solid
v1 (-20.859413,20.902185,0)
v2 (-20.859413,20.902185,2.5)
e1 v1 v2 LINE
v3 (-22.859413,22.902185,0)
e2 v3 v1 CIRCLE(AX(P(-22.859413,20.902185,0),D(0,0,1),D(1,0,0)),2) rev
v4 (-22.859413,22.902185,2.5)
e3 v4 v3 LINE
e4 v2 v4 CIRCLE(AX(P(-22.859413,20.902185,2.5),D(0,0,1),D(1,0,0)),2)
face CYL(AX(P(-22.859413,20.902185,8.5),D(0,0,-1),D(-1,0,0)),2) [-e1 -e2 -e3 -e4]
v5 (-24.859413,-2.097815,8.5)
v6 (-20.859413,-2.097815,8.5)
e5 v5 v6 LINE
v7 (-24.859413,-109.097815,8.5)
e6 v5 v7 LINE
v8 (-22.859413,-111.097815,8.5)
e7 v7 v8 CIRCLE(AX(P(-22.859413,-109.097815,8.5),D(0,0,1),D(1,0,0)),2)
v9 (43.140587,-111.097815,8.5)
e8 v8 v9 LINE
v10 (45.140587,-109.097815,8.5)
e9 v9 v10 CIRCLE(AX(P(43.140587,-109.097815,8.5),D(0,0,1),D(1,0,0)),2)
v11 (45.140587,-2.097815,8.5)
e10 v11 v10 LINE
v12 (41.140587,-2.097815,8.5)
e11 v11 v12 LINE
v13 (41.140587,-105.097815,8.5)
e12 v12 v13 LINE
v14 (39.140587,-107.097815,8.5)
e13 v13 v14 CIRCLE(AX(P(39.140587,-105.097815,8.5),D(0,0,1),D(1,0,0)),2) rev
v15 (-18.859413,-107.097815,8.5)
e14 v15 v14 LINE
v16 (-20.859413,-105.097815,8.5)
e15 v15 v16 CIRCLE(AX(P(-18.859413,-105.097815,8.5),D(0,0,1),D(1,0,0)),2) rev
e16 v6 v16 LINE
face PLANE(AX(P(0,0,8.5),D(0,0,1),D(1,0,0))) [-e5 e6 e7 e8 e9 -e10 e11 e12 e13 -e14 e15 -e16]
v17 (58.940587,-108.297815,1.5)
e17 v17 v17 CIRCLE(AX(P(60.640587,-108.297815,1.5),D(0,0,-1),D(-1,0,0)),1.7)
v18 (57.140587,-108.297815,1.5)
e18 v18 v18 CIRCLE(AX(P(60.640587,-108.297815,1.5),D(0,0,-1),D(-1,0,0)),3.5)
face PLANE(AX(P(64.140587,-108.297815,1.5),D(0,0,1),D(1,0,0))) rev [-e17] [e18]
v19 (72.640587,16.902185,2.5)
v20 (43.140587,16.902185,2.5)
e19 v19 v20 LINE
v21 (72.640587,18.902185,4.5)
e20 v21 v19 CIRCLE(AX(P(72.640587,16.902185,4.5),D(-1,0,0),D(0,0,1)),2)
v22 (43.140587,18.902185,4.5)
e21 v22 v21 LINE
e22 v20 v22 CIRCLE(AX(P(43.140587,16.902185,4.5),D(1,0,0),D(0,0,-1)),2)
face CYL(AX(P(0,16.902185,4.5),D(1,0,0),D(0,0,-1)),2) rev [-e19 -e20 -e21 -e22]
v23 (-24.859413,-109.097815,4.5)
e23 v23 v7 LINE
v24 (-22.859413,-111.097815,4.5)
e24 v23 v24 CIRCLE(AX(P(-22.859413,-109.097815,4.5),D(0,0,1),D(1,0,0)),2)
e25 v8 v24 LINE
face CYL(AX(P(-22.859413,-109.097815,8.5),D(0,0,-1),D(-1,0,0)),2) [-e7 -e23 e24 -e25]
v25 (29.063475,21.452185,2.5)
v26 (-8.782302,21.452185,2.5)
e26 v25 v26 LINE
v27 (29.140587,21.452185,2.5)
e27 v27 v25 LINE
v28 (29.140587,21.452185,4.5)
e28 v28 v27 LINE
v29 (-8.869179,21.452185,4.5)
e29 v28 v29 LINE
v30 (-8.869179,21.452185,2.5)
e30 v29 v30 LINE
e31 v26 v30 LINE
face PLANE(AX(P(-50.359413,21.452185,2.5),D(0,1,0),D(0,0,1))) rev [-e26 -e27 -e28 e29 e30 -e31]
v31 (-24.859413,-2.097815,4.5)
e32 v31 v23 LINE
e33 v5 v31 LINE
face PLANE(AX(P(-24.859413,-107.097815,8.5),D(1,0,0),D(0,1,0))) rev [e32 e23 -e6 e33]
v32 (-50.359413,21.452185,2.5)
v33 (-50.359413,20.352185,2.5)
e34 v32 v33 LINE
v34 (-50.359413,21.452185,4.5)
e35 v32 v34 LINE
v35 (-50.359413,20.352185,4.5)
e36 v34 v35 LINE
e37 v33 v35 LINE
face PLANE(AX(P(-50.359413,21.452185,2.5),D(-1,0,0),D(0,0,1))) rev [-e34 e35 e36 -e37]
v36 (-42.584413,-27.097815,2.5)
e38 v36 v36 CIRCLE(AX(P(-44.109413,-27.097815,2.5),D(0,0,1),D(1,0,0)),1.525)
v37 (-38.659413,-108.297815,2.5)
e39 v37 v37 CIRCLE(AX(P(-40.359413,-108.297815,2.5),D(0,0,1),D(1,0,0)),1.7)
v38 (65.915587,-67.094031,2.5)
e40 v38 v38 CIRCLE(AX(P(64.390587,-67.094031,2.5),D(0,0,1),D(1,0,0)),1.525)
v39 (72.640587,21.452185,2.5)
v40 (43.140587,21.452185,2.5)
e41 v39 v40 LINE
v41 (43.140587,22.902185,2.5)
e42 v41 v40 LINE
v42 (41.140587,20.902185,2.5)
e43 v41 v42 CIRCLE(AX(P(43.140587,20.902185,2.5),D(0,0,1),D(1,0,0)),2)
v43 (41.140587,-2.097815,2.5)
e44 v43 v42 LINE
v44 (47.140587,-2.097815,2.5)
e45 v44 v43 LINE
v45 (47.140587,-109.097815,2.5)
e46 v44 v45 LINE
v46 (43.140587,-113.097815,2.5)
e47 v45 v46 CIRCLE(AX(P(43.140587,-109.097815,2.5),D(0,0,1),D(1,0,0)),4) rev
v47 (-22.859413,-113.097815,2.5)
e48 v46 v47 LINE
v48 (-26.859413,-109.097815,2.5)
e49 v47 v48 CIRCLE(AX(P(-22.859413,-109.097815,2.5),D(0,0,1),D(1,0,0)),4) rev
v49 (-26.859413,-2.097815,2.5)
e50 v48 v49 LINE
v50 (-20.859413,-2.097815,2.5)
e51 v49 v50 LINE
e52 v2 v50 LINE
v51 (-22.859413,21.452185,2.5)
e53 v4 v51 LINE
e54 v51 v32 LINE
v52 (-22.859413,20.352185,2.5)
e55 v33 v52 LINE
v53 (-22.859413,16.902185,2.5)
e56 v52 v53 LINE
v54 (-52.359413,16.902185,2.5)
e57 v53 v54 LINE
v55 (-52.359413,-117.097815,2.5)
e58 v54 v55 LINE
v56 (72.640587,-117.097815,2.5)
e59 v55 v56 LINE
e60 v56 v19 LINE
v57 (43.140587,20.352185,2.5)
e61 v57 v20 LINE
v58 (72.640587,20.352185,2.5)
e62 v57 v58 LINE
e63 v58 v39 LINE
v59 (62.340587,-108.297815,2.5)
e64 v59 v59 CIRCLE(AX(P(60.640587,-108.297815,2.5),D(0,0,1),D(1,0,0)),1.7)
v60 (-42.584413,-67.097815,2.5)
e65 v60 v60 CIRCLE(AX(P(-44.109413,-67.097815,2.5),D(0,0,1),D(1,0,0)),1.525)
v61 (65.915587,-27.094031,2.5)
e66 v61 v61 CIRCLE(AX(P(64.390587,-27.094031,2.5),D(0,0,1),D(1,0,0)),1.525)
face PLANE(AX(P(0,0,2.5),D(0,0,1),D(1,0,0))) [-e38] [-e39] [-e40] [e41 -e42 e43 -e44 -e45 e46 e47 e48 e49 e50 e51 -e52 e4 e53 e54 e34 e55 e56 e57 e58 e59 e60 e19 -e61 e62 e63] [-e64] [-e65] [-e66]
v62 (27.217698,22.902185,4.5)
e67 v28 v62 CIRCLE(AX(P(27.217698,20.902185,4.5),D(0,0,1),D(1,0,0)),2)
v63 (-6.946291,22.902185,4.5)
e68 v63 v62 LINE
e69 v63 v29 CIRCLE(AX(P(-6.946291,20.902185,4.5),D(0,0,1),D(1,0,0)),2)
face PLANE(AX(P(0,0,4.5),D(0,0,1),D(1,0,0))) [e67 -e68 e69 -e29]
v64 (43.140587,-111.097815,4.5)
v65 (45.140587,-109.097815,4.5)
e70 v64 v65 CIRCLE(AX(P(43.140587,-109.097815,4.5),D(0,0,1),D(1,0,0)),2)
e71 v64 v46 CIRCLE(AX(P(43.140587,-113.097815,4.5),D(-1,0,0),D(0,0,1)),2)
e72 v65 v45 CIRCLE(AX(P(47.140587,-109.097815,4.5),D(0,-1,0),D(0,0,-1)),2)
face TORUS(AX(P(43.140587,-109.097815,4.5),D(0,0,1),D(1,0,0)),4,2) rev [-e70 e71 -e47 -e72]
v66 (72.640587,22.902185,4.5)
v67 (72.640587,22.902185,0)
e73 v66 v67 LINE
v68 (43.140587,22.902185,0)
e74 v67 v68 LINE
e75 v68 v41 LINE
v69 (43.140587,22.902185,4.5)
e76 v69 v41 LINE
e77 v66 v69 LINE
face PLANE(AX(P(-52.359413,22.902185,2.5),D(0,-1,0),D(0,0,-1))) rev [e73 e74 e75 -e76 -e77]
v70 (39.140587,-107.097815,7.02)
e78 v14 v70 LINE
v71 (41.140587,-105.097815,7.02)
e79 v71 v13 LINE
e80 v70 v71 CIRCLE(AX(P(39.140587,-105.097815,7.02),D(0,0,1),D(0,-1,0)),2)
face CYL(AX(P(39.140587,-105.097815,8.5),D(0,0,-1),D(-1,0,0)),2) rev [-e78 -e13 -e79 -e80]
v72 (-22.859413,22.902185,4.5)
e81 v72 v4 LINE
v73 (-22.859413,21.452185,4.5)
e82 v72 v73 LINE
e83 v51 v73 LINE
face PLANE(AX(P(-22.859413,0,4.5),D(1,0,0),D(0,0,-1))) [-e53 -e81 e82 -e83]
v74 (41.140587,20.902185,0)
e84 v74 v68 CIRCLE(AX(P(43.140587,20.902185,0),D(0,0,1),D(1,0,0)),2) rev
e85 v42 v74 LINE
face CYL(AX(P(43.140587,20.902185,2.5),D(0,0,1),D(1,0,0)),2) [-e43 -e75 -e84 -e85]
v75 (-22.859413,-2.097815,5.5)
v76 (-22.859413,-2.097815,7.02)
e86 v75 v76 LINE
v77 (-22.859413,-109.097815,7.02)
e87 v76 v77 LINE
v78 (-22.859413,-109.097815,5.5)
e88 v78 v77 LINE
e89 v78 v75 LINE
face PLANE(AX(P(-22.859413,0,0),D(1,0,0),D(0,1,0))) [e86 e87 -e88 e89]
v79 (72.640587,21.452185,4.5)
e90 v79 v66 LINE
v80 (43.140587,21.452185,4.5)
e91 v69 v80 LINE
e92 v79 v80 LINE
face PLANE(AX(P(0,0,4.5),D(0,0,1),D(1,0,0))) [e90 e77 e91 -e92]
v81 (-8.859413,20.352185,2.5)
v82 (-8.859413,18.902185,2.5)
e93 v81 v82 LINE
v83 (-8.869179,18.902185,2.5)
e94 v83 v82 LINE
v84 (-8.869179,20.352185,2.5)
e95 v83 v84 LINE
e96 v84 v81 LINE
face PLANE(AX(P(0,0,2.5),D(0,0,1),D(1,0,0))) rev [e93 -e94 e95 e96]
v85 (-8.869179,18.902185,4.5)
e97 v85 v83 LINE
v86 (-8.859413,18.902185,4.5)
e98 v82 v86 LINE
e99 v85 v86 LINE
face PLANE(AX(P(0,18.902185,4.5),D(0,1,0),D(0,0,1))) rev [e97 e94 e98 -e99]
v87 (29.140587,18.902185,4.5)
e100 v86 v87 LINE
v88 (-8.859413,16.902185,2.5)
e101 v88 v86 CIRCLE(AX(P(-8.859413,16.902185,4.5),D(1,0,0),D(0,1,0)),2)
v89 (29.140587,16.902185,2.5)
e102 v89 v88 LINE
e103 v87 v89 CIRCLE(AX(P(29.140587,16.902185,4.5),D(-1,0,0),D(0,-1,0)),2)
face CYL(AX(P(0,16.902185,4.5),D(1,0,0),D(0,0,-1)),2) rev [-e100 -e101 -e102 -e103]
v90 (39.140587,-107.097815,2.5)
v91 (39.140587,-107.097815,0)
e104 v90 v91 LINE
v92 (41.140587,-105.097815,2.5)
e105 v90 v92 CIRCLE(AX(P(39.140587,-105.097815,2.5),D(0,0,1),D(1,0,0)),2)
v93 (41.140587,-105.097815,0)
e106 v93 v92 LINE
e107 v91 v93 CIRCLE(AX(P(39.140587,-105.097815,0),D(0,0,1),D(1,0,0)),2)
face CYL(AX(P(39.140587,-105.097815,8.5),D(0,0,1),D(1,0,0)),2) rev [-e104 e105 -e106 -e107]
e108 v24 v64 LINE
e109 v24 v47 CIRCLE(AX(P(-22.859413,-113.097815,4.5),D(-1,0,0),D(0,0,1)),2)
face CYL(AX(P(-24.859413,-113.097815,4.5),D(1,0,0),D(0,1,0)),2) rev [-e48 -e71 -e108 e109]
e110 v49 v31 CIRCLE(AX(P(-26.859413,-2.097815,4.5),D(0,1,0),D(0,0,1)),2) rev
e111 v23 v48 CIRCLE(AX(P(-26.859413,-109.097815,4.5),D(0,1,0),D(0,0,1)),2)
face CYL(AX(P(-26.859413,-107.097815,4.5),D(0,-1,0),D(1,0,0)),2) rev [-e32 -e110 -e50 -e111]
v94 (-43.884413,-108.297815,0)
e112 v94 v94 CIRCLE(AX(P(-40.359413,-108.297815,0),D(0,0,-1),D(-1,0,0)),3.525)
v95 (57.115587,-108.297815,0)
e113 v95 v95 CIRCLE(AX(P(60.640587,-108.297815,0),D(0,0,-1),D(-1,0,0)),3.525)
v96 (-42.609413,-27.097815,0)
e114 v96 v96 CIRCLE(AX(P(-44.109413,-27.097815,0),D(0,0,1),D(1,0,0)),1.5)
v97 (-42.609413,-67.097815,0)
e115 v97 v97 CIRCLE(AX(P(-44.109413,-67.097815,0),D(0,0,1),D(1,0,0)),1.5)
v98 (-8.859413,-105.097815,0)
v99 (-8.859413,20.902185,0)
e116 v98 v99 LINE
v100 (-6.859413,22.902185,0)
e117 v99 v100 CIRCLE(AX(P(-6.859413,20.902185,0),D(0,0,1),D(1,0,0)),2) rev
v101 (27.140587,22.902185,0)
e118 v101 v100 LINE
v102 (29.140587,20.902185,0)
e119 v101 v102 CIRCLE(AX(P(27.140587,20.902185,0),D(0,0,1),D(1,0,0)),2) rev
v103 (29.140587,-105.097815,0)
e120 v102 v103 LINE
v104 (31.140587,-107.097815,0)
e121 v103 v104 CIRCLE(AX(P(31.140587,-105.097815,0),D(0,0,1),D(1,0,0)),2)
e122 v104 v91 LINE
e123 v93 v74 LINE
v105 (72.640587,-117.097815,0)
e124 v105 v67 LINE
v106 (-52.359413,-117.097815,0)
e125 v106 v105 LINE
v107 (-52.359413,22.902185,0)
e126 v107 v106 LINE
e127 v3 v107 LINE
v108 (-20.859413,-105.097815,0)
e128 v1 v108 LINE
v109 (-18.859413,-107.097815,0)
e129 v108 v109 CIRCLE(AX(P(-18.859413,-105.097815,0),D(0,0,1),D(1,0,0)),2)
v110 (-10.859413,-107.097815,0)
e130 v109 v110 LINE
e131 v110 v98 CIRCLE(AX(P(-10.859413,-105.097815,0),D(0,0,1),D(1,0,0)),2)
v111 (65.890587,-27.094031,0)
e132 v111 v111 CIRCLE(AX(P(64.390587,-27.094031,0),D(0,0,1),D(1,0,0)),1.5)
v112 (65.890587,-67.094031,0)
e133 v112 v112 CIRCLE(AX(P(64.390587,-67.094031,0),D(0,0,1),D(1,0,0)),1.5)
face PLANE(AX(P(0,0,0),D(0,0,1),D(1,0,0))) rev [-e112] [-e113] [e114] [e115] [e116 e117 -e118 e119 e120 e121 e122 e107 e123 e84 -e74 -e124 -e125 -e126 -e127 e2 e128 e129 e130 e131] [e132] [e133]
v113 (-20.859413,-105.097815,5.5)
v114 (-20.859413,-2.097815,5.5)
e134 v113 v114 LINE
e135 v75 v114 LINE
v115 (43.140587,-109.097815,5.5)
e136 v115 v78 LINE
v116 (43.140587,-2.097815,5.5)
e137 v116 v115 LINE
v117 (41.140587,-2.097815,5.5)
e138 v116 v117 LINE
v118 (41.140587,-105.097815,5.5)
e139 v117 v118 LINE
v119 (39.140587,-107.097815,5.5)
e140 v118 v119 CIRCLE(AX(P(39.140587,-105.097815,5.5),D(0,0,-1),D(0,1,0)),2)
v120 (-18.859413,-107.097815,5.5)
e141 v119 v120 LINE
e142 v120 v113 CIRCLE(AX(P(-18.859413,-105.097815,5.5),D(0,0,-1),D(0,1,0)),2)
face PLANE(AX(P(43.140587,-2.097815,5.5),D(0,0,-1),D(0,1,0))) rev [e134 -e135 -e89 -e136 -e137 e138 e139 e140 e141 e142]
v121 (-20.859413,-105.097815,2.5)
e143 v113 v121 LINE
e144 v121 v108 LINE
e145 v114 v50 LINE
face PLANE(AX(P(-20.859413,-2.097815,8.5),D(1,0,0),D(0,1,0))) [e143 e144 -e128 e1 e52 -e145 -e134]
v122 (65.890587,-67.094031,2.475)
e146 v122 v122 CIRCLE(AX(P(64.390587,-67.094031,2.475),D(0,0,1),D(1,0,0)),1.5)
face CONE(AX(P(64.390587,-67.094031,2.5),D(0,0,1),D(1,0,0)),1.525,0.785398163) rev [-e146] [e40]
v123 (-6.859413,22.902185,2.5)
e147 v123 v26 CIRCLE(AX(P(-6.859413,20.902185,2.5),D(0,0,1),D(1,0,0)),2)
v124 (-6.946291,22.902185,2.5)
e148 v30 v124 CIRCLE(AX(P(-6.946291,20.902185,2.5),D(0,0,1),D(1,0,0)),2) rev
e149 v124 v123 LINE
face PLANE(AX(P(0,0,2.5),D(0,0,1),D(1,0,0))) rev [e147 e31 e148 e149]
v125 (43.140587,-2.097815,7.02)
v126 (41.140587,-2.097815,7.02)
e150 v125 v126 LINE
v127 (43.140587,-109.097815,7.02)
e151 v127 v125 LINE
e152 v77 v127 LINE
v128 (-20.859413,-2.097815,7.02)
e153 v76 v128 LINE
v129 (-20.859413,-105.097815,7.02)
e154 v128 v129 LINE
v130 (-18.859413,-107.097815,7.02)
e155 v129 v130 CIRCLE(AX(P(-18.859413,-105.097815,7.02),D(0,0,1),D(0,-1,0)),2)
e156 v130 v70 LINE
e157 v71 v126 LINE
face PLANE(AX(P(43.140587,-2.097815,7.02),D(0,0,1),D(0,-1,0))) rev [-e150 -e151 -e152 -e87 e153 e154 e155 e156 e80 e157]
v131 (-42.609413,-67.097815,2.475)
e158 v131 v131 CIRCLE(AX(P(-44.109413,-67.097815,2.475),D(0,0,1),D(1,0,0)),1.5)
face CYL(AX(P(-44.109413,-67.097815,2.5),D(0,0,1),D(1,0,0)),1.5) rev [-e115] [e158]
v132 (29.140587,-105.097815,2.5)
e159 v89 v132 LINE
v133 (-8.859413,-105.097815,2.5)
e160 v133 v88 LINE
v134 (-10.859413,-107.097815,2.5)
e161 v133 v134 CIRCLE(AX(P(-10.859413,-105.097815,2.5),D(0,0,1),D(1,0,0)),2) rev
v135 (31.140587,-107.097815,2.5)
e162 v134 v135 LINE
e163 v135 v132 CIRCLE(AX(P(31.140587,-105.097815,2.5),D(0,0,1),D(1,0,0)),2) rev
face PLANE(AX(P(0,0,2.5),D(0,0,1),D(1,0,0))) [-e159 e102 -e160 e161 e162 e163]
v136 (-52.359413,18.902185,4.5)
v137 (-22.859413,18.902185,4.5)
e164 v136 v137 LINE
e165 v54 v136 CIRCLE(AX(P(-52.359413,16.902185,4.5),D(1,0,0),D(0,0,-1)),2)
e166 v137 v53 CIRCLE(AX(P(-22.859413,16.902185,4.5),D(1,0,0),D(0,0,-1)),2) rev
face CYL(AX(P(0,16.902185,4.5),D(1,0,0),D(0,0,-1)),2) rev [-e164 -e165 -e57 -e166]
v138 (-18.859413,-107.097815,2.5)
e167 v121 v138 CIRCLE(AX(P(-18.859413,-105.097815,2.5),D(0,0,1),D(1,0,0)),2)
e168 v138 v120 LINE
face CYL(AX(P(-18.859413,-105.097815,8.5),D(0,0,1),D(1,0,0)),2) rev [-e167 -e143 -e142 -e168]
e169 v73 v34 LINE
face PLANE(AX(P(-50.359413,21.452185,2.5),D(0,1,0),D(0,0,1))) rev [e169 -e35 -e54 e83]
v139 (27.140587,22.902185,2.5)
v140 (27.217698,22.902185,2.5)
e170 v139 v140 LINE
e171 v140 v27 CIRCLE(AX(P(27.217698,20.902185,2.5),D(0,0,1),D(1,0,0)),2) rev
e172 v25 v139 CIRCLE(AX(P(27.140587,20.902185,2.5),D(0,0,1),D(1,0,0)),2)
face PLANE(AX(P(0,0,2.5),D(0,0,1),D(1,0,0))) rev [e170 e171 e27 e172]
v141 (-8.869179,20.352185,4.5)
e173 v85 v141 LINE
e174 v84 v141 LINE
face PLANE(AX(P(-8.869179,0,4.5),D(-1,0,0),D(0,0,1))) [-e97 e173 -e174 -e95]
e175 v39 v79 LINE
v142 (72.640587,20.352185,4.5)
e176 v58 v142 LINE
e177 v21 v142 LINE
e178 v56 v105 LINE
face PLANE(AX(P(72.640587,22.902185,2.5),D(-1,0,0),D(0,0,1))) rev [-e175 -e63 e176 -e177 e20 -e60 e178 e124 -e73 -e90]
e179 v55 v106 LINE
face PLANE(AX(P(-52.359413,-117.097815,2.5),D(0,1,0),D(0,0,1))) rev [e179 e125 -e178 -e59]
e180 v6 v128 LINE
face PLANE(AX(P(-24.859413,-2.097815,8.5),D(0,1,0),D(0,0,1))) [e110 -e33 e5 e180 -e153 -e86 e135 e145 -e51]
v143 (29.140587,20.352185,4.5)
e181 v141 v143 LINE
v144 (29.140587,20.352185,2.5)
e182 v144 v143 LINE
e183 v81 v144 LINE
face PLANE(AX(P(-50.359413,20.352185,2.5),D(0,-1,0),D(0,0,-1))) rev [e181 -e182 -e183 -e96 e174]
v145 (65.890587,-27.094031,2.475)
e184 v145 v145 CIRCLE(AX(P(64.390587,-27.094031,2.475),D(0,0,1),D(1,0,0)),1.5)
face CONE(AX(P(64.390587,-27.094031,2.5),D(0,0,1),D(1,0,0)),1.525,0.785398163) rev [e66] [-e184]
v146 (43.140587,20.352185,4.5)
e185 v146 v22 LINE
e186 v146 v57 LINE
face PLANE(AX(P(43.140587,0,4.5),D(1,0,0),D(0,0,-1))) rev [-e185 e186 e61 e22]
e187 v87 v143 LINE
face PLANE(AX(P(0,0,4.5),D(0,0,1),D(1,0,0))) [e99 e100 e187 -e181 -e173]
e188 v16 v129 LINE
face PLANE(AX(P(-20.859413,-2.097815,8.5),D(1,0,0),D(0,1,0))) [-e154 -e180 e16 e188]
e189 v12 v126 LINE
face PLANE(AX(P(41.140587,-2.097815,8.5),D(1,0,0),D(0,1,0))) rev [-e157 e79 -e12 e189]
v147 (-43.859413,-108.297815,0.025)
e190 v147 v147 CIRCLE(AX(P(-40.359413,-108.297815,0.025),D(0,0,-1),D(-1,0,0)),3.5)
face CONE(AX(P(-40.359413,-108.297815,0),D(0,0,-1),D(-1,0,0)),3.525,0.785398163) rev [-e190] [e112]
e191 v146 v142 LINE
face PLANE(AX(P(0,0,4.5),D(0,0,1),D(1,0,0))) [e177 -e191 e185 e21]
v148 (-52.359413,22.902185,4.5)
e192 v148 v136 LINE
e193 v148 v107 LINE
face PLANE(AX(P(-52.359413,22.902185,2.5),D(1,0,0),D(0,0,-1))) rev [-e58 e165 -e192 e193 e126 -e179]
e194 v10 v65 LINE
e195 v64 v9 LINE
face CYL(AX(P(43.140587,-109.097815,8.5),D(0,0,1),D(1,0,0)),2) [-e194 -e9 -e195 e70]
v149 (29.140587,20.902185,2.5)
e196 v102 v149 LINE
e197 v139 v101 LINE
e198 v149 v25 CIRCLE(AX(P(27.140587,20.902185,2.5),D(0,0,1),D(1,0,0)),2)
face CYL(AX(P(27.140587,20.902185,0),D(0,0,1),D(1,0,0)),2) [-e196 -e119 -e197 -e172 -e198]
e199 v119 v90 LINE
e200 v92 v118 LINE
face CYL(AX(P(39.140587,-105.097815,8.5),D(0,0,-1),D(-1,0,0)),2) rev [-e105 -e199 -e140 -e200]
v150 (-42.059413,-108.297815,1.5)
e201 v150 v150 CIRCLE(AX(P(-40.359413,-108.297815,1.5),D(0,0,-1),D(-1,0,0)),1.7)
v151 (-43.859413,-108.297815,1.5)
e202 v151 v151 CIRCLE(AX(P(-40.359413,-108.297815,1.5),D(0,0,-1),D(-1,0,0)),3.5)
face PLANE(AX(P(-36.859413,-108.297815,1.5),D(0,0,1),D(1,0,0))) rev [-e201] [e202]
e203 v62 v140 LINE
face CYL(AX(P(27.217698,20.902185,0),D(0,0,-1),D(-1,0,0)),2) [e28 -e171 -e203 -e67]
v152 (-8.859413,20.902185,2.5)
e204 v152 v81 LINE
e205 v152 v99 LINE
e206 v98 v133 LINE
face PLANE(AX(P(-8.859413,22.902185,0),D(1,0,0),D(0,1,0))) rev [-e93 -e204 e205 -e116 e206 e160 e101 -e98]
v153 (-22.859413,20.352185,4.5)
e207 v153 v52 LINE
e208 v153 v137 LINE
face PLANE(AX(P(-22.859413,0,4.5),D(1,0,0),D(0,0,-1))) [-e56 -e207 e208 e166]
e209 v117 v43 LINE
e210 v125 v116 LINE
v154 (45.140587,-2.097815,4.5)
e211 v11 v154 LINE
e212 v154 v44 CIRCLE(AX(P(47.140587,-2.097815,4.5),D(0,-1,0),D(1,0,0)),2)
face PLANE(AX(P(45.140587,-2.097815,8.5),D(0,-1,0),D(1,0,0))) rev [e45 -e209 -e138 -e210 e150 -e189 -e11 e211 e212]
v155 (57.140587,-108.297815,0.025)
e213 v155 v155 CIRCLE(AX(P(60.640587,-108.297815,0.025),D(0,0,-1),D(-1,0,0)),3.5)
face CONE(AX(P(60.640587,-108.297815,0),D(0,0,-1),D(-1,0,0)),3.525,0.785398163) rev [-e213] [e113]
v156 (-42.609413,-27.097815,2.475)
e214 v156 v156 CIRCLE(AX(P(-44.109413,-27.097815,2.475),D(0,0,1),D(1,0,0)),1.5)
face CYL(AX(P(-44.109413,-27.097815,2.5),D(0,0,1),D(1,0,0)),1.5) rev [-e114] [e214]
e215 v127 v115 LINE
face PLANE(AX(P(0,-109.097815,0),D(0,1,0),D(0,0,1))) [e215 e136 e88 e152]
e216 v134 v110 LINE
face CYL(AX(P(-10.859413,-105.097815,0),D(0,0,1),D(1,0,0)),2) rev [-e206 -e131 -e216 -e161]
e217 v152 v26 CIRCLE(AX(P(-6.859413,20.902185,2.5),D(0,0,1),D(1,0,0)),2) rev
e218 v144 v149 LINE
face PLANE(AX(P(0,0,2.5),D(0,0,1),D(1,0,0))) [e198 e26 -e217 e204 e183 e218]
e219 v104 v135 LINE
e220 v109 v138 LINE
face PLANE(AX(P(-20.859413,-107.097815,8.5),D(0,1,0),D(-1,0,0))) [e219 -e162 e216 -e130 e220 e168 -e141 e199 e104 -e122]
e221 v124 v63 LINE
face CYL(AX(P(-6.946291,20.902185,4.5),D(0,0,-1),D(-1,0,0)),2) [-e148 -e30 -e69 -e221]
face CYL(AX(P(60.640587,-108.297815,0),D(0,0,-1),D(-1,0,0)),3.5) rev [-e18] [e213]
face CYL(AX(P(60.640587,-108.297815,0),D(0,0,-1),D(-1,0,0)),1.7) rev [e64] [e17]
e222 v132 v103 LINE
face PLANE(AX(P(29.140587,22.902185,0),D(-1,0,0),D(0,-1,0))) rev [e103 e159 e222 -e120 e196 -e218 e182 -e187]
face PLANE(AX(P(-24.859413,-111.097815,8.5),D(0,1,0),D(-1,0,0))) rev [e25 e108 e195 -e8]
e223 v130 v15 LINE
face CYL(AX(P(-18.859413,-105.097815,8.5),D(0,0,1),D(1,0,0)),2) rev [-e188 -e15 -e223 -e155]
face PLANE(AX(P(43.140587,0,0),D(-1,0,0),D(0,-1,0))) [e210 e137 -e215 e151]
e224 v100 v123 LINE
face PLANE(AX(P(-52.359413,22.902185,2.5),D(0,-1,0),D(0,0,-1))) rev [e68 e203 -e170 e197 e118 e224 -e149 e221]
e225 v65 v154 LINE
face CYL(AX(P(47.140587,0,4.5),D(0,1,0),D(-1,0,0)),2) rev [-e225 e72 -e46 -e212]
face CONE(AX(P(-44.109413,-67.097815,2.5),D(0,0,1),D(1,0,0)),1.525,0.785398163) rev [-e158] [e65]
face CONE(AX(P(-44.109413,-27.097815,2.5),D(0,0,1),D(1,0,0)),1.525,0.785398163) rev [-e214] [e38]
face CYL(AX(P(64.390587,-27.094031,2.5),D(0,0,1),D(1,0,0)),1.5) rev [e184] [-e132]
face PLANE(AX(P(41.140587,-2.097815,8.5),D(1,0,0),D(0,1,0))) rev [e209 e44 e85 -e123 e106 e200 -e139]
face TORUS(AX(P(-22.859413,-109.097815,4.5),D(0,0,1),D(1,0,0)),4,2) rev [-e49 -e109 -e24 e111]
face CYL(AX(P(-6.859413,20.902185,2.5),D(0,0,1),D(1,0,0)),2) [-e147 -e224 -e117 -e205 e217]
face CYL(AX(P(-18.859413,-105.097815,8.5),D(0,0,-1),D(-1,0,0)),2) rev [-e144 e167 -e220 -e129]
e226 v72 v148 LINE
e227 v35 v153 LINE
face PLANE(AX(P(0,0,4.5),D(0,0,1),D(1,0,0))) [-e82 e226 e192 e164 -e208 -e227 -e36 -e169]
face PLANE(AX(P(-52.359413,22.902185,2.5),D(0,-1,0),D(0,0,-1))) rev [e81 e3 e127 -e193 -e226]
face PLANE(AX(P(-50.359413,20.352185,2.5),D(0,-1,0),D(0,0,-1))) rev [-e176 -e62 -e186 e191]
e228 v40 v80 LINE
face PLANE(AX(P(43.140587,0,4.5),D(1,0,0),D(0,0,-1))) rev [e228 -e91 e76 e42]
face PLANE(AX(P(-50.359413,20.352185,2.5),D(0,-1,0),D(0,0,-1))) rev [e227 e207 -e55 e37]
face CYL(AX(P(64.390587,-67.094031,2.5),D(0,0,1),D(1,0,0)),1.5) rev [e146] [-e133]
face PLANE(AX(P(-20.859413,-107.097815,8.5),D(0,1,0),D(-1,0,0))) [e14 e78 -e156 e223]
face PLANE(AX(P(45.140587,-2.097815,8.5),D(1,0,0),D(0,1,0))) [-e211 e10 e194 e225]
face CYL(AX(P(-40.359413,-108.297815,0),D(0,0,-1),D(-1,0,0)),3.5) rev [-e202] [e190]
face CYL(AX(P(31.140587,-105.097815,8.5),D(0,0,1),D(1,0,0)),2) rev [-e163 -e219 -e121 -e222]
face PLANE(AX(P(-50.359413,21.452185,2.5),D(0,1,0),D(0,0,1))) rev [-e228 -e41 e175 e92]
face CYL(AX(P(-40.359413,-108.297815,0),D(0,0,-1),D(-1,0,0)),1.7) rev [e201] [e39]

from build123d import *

# Parameters (mm, degrees)
ESBO_O1_W                                    = 125
ESBO_O1_H                                    = 140
RESSALTO_EXTRUS_O1_DEPTH                     = 2.5
RESSALTO_EXTRUS_O2_DEPTH                     = 6
ESBO_O3_W                                    = 1.52
ESBO_O3_H                                    = 105
CORTE_EXTRUS_O1_DEPTH                        = 2
ESBO_O4_W                                    = 1.52
ESBO_O4_H                                    = 105
CORTE_EXTRUS_O2_DEPTH                        = 2
ESBO_O5_W                                    = 66
ESBO_O5_H                                    = 1.52
CORTE_EXTRUS_O3_DEPTH                        = 2
FILETE1_R                                    = 2
FILETE2_R                                    = 2
FILETE3_R                                    = 2
ESBO_O6_W                                    = 12
ESBO_O6_H                                    = 130
CORTE_EXTRUS_O4_DEPTH                        = 138.929522592
FILETE4_R                                    = 2
FILETE5_R                                    = 2
ESBO_O7_W                                    = 19.009766083
ESBO_O7_H                                    = 4
ESBO_O7_W_2                                  = 19
ESBO_O7_W_3                                  = 29.5
RESSALTO_EXTRUS_O3_DEPTH                     = 2
ESBO_O8_W                                    = 123
ESBO_O8_H                                    = 1.1
CORTE_EXTRUS_O5_DEPTH                        = 2
FILETE6_R                                    = 2
FUROS_GUIA_COM_3_0MM1_D                      = 3
FUROS_GUIA_COM_3_0MM1_CSINK_D                = 3.05
FUROS_GUIA_COM_3_0MM1_CSINK_ANGLE            = 90
REBAIXO_PARA_PARAFUSO_COM_CABE_A_PAN_2_COUNT = 2
REBAIXO_PARA_PARAFUSO_COM_CABE_A_PAN_2_PITCH = 101


with BuildPart() as part:
    # Esboço1 → Ressalto-extrusão1 (new body)
    with BuildSketch(Plane.XY):
        with Locations((10.140586838, -47.097815293)):
            Rectangle(ESBO_O1_W, ESBO_O1_H)
    extrude(amount=RESSALTO_EXTRUS_O1_DEPTH)

    # Esboço2 → Ressalto-extrusão2 (add)
    with BuildSketch(Plane.XY.offset(2.5)):
        Polygon((-24.859413162, -2.097815293), (-20.859413162, -2.097815293), (-20.859413162, -107.097815293), (41.140586838, -107.097815293), (41.140586838, -2.097815293), (45.140586838, -2.097815293), (45.140586838, -107.097815293), (45.140586838, -111.097815293), (-24.859413162, -111.097815293), (-24.859413162, -107.097815293), align=None)
    extrude(amount=RESSALTO_EXTRUS_O2_DEPTH)

    # Esboço3 → Corte-extrusão1 (cut)
    with BuildSketch(Plane.ZY.offset(-41.140586838)):
        with Locations((6.26, -54.597815293)):
            Rectangle(ESBO_O3_W, ESBO_O3_H)
    extrude(amount=-CORTE_EXTRUS_O1_DEPTH, mode=Mode.SUBTRACT)

    # Esboço4 → Corte-extrusão2 (cut)
    with BuildSketch(Plane(origin=(-20.859413162, 0, 0), x_dir=(0, 0, -1), z_dir=(1, 0, 0))):
        with Locations((-6.26, -54.597815293)):
            Rectangle(ESBO_O4_W, ESBO_O4_H)
    extrude(amount=-CORTE_EXTRUS_O2_DEPTH, mode=Mode.SUBTRACT)

    # Esboço5 → Corte-extrusão3 (cut)
    with BuildSketch(Plane(origin=(0, -107.097815293, 0), x_dir=(1, 0, 0), z_dir=(0, 1, 0))):
        with Locations((10.140586838, -6.26)):
            Rectangle(ESBO_O5_W, ESBO_O5_H)
    extrude(amount=-CORTE_EXTRUS_O3_DEPTH, mode=Mode.SUBTRACT)

    # Filete1
    filete1_edges = [part.edges().sort_by_distance(p)[0] for p in [
        (41.140586838, -107.097815293, 7.76),
        (-20.859413162, -107.097815293, 7.76),
        (41.140586838, -107.097815293, 4),
        (-20.859413162, -107.097815293, 4),
    ]]
    fillet(filete1_edges, radius=FILETE1_R)

    # Filete2
    filete2_edges = [part.edges().sort_by_distance(p)[0] for p in [
        (-24.859413162, -111.097815293, 5.5),
        (45.140586838, -111.097815293, 5.5),
    ]]
    fillet(filete2_edges, radius=FILETE2_R)

    # Filete3
    filete3_edges = [part.edges().sort_by_distance(p)[0] for p in [
        (10.140586838, -111.097815293, 2.5),
        (-24.273626724, -110.512028855, 2.5),
        (44.5548004, -110.512028855, 2.5),
        (-24.859413162, -55.597815293, 2.5),
        (45.140586838, -55.597815293, 2.5),
    ]]
    fillet(filete3_edges, radius=FILETE3_R)

    # Esboço6 → Corte-extrusão4 (cut, through all)
    with BuildSketch(Plane.XY.offset(2.5)):
        with Locations((-14.859413162, -42.097815293)):
            Rectangle(ESBO_O6_W, ESBO_O6_H)
        with Locations((35.140586838, -42.097815293)):
            Rectangle(ESBO_O6_W, ESBO_O6_H)
    extrude(amount=-CORTE_EXTRUS_O4_DEPTH, mode=Mode.SUBTRACT)

    # Filete4
    filete4_edges = [part.edges().sort_by_distance(p)[0] for p in [
        (-20.859413162, 22.902184707, 1.25),
        (-8.859413162, 22.902184707, 1.25),
        (41.140586838, 22.902184707, 1.25),
        (29.140586838, 22.902184707, 1.25),
    ]]
    fillet(filete4_edges, radius=FILETE4_R)

    # Filete5
    filete5_edges = [part.edges().sort_by_distance(p)[0] for p in [
        (-20.859413162, -107.097815293, 1.25),
        (-8.859413162, -107.097815293, 1.25),
        (41.140586838, -107.097815293, 1.25),
        (29.140586838, -107.097815293, 1.25),
    ]]
    fillet(filete5_edges, radius=FILETE5_R)

    # Esboço7 → Ressalto-extrusão3 (add)
    with BuildSketch(Plane.XY.offset(2.5)):
        with Locations((0.635703797, 20.902184707)):
            Rectangle(ESBO_O7_W, ESBO_O7_H)
        with Locations((19.640586838, 20.902184707)):
            Rectangle(ESBO_O7_W_2, ESBO_O7_H)
        with Locations((-37.609413162, 20.902184707)):
            Rectangle(ESBO_O7_W_3, ESBO_O7_H)
        with Locations((57.890586838, 20.902184707)):
            Rectangle(ESBO_O7_W_3, ESBO_O7_H)
    extrude(amount=RESSALTO_EXTRUS_O3_DEPTH)

    # Esboço8 → Corte-extrusão5 (cut)
    with BuildSketch(Plane.XY.offset(4.5)):
        with Locations((11.140586838, 20.902184707)):
            Rectangle(ESBO_O8_W, ESBO_O8_H)
    extrude(amount=-CORTE_EXTRUS_O5_DEPTH, mode=Mode.SUBTRACT)

    # Filete6
    # the kernel refuses this fillet: 2 mm, written as the material it adds along each edge
    with BuildSketch(Plane(origin=(43.140586838, 18.902184707, 2.5), x_dir=(0, 0, 1), z_dir=(1, 0, 0)), Plane(origin=(-52.359413162, 18.902184707, 2.5), x_dir=(0, 0, 1), z_dir=(1, 0, 0))) as filete6_piece_1:
        with BuildLine():
            CenterArc((FILETE6_R, FILETE6_R), FILETE6_R, 180, 90)
            Line((0, FILETE6_R), (0, 0))
            Line((0, 0), (FILETE6_R, 0))
        make_face()
    extrude(amount=29.5)
    with BuildSketch(Plane(origin=(29.140586838, 18.902184707, 2.5), x_dir=(0, 0, 1), z_dir=(-1, 0, 0))) as filete6_piece_2:
        with BuildLine():
            CenterArc((FILETE6_R, -FILETE6_R), FILETE6_R, 90, 90)
            Line((0, -FILETE6_R), (0, 0))
            Line((0, 0), (FILETE6_R, 0))
        make_face()
    extrude(amount=38)
    # the kernel refuses this fillet: 2 mm, written as the material it takes off along each edge
    with BuildSketch(Plane(origin=(29.140586838, 22.902184707, -2.307221131), x_dir=(-1, 0, 0), z_dir=(0, 0, 1))) as filete6_2_piece_1:
        with BuildLine():
            CenterArc((1.922888452, 2), FILETE6_R, 195.962014163, 74.037985837)
            Line((0, 1.45), (0, 0))
            Line((0, 0), (1.922888452, 0))
        make_face()
    extrude(amount=11.614442262, mode=Mode.SUBTRACT)
    with BuildSketch(Plane(origin=(-8.869179245, 22.902184707, -2.307221131), x_dir=(1, 0, 0), z_dir=(0, 0, 1))) as filete6_2_piece_2:
        with BuildLine():
            CenterArc((1.922888452, -2), FILETE6_R, 90, 74.037985837)
            Line((0, -1.45), (0, 0))
            Line((0, 0), (1.922888452, 0))
        make_face()
    extrude(amount=11.614442262, mode=Mode.SUBTRACT)

    # Furos-guia com Ø3.0mm1 (through all)
    with Locations(Plane.XY.offset(2.5)):
        with Locations((-44.109413162, -27.097815293), (-44.109413162, -67.097815293), (64.390586838, -27.094030717), (64.390586838, -67.094030814)):
            CounterSinkHole(FUROS_GUIA_COM_3_0MM1_D / 2, FUROS_GUIA_COM_3_0MM1_CSINK_D / 2, counter_sink_angle=FUROS_GUIA_COM_3_0MM1_CSINK_ANGLE)

    # Esboço14 → Rebaixo para parafuso com cabeça panela de M31 (revolve, cut)
    with BuildSketch(Plane(origin=(-40.359413162, -108.297815293, 0), x_dir=(0, 1, 0), z_dir=(1, 0, 0))):
        Polygon((0, 0), (0, 8.5), (1.7, 8.5), (1.7, 1.5), (3.5, 1.5), (3.5, 0.025), (3.525, 0), align=None)
    rebaixo_para_parafuso_com_cabe_a_panela = revolve(axis=Axis((-40.359413162, -108.297815293, -6.35), (0, 0, 1)), mode=Mode.SUBTRACT)

    # Rebaixo para parafuso com cabe_a pan 2: Rebaixo para parafuso com cabeça panela de M31 ×2
    with Locations(*[(i * REBAIXO_PARA_PARAFUSO_COM_CABE_A_PAN_2_PITCH, 0, 0) for i in range(1, REBAIXO_PARA_PARAFUSO_COM_CABE_A_PAN_2_COUNT)]):
        add(rebaixo_para_parafuso_com_cabe_a_panela, mode=Mode.SUBTRACT)


solid = part.part
